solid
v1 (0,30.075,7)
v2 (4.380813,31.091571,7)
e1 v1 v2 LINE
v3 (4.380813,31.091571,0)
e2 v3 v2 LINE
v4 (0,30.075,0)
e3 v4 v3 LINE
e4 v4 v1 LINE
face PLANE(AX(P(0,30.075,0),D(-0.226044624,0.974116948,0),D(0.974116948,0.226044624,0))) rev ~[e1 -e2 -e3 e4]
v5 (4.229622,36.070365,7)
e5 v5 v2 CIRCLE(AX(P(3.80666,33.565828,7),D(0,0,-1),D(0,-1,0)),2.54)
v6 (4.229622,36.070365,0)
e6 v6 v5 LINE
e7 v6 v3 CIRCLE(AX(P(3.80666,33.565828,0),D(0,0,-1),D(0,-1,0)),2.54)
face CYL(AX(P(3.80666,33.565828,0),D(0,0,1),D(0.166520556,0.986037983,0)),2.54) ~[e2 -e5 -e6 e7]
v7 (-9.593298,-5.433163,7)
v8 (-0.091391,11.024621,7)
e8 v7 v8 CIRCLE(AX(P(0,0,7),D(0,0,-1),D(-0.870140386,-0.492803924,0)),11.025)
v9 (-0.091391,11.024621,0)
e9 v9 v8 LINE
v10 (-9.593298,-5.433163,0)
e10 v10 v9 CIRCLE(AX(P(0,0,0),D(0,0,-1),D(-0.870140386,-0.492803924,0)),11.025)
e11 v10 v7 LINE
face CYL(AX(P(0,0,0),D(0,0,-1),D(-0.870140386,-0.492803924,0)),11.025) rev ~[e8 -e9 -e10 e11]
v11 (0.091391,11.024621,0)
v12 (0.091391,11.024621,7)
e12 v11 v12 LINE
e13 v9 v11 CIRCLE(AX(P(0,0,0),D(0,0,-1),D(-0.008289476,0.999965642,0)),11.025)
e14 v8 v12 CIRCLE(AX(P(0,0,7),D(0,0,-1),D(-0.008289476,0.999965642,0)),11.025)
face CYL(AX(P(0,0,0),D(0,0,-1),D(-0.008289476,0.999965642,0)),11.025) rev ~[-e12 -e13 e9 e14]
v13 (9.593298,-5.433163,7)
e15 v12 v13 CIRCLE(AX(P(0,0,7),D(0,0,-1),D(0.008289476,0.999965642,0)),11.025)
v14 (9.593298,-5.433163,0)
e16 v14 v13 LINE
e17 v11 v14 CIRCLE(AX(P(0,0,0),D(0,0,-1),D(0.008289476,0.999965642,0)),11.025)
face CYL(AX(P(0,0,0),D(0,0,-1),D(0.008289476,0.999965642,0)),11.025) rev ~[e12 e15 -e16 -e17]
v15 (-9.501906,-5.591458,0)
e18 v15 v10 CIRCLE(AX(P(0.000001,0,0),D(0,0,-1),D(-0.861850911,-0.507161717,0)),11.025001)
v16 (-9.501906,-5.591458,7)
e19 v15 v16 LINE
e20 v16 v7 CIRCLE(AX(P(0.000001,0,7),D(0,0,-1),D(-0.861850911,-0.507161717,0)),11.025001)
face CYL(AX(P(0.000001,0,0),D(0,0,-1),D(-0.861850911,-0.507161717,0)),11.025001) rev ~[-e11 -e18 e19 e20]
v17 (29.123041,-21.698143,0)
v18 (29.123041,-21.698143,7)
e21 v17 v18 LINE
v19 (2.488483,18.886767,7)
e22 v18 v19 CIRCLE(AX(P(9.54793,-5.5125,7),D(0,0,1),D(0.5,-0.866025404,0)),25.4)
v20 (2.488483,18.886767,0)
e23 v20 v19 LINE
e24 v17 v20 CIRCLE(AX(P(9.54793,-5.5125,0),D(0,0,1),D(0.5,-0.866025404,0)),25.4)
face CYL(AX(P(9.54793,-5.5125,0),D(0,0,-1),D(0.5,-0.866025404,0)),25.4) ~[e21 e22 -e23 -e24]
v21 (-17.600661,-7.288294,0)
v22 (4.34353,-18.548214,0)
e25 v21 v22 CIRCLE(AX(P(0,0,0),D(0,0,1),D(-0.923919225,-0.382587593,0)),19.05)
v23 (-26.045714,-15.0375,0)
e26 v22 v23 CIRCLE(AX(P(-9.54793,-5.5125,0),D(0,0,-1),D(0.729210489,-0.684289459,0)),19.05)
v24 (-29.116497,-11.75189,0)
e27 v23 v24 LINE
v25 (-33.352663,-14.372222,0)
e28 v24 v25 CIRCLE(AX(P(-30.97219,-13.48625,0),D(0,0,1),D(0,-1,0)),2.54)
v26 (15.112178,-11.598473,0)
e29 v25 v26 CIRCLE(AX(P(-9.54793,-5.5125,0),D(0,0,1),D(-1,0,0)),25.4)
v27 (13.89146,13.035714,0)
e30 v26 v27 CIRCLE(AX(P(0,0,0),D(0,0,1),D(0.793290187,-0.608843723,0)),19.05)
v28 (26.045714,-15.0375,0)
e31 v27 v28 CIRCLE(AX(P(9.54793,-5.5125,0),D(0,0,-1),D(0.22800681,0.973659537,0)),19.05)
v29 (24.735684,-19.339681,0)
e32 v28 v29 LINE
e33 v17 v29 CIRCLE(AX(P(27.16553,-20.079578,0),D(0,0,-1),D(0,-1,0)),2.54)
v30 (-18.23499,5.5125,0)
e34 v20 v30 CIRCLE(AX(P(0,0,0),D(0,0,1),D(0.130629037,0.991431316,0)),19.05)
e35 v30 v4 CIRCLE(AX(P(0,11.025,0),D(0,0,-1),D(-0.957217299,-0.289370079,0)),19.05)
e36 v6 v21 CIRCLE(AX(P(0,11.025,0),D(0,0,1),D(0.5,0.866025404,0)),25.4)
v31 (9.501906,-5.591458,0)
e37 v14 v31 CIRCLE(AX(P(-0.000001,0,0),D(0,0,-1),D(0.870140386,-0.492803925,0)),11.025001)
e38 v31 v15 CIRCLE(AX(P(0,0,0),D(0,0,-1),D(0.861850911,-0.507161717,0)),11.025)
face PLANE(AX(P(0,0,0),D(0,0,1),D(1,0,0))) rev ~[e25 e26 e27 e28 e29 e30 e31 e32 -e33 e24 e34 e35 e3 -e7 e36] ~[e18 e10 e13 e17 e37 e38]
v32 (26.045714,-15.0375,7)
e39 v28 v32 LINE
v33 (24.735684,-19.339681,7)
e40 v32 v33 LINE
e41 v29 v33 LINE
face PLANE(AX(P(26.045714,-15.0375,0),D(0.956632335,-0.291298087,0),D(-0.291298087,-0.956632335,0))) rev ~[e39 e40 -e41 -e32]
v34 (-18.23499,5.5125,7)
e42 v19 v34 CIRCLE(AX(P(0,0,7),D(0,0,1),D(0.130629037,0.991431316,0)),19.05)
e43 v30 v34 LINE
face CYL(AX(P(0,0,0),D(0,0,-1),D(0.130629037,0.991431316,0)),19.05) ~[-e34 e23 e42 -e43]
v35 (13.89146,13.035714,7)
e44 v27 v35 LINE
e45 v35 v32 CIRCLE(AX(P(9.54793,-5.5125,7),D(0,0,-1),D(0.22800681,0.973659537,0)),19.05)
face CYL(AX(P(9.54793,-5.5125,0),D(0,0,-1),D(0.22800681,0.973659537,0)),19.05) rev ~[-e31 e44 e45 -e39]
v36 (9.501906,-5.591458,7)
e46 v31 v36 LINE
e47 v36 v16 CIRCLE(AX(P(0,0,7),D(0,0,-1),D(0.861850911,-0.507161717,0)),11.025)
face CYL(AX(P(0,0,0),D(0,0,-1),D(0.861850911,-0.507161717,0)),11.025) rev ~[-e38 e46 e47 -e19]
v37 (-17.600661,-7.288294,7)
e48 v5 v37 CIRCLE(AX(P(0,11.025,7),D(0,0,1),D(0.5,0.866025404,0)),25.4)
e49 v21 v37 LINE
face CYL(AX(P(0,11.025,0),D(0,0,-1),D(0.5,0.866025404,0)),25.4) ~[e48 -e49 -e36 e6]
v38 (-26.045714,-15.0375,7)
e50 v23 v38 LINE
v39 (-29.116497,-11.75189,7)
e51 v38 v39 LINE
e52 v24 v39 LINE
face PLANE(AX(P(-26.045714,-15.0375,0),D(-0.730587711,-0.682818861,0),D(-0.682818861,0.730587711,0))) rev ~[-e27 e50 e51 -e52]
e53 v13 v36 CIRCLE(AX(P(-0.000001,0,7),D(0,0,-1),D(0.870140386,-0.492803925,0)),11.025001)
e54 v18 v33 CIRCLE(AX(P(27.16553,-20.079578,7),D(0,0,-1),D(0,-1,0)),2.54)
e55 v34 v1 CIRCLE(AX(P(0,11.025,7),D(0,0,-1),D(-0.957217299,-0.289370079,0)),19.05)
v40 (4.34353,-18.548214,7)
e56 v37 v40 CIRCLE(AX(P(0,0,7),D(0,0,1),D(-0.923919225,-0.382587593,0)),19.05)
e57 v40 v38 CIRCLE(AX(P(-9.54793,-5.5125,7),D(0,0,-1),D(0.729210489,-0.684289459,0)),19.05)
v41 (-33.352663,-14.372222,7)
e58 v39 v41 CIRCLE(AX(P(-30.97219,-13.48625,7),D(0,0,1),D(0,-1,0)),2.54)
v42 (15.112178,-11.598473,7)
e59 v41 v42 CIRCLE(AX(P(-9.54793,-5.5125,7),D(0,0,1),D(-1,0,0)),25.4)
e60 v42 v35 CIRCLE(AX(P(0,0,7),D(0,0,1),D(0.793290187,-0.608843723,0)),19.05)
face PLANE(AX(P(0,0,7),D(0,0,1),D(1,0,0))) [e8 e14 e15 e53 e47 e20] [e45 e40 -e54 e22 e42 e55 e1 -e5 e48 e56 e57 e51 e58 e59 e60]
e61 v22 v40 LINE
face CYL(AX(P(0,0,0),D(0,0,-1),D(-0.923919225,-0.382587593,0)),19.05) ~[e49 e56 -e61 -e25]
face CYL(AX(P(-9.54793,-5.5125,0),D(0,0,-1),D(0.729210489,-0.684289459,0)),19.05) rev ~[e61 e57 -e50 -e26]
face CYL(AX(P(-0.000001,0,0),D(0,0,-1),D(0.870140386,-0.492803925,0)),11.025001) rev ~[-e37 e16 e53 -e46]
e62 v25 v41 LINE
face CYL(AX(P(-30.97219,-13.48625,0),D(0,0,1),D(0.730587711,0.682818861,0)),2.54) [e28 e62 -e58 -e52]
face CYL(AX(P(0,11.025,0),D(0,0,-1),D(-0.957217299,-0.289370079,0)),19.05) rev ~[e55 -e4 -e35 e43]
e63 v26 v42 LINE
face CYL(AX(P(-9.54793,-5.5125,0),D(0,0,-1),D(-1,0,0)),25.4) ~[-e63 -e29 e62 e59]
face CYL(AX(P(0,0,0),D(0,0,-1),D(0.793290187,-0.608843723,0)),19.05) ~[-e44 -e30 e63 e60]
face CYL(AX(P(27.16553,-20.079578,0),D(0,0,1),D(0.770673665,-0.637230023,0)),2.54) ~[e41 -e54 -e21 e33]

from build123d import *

# Parameters (mm, degrees)
F1_DEPTH = 7
F2_R     = 2.54


# Not quite as in the source:
# - a feature names something its author has since deleted; it is built from what else it names


with BuildPart() as f1:
    # F0 (on Top) → F1 (new body)
    with BuildSketch(Plane.XY):
        with BuildLine():
            ThreePointArc((12.7, 33.0220452561), (-20.3035705189, 26.2868814104), (-17.6006612279, -7.2882936508))
            ThreePointArc((-17.6006612279, -7.2882936508), (-8.6968003579, -16.9489870947), (4.3435297347, -18.5482141848))
            ThreePointArc((4.3435297347, -18.5482141848), (-11.7341390993, -24.436637764), (-26.0457140188, -15.0375))
            Line((-26.0457140188, -15.0375), (-34.9479300767, -5.5125))
            ThreePointArc((-34.9479300767, -5.5125), (-12.6133218282, -30.7268485621), (15.1121780658, -11.5984729214))
            ThreePointArc((15.1121780658, -11.5984729214), (19.0266535713, 0.9428435058), (13.8914598115, 13.0357141848))
            ThreePointArc((13.8914598115, 13.0357141848), (27.0298186363, 2.0562563305), (26.0457140188, -15.0375))
            Line((26.0457140188, -15.0375), (22.2479300767, -27.5095452561))
            ThreePointArc((22.2479300767, -27.5095452561), (32.9168923471, 4.4399671517), (2.4884831621, 18.8867665722))
            ThreePointArc((2.4884831621, 18.8867665722), (-10.3298532135, 16.0061435889), (-18.2349895462, 5.5125))
            ThreePointArc((-18.2349895462, 5.5125), (-15.295679537, 22.3803814335), (0, 30.075))
            Line((0, 30.075), (12.7, 33.0220452561))
        make_face()
        with BuildLine():
            ThreePointArc((0.0913914699, 11.0246211998), (7.8280973408, 7.7634732577), (11.025, 0))
            ThreePointArc((11.025, 0), (10.6610677893, -2.8093163923), (9.5932977611, -5.4331632653))
            ThreePointArc((9.5932977611, -5.4331632653), (9.5479300767, -5.5125), (9.5019062912, -5.5914579345))
            ThreePointArc((9.5019062912, -5.5914579345), (0, -11.025), (-9.5019062912, -5.5914579345))
            ThreePointArc((-9.5019062912, -5.5914579345), (-9.5479300767, -5.5125), (-9.5932977611, -5.4331632653))
            ThreePointArc((-9.5932977611, -5.4331632653), (-9.5479300767, 5.5125), (-0.0913914699, 11.0246211998))
            ThreePointArc((-0.0913914699, 11.0246211998), (0, 11.025), (0.0913914699, 11.0246211998))
        make_face(mode=Mode.SUBTRACT)
    extrude(amount=F1_DEPTH)

    # F2
    f2_edges = [f1.edges().sort_by_distance(p)[0] for p in [
        (12.7, 33.022045, 3.5),
        (22.24793, -27.509545, 3.5),
        (-34.94793, -5.5125, 3.5),
    ]]
    fillet(f2_edges, radius=F2_R)


solid = f1.part
